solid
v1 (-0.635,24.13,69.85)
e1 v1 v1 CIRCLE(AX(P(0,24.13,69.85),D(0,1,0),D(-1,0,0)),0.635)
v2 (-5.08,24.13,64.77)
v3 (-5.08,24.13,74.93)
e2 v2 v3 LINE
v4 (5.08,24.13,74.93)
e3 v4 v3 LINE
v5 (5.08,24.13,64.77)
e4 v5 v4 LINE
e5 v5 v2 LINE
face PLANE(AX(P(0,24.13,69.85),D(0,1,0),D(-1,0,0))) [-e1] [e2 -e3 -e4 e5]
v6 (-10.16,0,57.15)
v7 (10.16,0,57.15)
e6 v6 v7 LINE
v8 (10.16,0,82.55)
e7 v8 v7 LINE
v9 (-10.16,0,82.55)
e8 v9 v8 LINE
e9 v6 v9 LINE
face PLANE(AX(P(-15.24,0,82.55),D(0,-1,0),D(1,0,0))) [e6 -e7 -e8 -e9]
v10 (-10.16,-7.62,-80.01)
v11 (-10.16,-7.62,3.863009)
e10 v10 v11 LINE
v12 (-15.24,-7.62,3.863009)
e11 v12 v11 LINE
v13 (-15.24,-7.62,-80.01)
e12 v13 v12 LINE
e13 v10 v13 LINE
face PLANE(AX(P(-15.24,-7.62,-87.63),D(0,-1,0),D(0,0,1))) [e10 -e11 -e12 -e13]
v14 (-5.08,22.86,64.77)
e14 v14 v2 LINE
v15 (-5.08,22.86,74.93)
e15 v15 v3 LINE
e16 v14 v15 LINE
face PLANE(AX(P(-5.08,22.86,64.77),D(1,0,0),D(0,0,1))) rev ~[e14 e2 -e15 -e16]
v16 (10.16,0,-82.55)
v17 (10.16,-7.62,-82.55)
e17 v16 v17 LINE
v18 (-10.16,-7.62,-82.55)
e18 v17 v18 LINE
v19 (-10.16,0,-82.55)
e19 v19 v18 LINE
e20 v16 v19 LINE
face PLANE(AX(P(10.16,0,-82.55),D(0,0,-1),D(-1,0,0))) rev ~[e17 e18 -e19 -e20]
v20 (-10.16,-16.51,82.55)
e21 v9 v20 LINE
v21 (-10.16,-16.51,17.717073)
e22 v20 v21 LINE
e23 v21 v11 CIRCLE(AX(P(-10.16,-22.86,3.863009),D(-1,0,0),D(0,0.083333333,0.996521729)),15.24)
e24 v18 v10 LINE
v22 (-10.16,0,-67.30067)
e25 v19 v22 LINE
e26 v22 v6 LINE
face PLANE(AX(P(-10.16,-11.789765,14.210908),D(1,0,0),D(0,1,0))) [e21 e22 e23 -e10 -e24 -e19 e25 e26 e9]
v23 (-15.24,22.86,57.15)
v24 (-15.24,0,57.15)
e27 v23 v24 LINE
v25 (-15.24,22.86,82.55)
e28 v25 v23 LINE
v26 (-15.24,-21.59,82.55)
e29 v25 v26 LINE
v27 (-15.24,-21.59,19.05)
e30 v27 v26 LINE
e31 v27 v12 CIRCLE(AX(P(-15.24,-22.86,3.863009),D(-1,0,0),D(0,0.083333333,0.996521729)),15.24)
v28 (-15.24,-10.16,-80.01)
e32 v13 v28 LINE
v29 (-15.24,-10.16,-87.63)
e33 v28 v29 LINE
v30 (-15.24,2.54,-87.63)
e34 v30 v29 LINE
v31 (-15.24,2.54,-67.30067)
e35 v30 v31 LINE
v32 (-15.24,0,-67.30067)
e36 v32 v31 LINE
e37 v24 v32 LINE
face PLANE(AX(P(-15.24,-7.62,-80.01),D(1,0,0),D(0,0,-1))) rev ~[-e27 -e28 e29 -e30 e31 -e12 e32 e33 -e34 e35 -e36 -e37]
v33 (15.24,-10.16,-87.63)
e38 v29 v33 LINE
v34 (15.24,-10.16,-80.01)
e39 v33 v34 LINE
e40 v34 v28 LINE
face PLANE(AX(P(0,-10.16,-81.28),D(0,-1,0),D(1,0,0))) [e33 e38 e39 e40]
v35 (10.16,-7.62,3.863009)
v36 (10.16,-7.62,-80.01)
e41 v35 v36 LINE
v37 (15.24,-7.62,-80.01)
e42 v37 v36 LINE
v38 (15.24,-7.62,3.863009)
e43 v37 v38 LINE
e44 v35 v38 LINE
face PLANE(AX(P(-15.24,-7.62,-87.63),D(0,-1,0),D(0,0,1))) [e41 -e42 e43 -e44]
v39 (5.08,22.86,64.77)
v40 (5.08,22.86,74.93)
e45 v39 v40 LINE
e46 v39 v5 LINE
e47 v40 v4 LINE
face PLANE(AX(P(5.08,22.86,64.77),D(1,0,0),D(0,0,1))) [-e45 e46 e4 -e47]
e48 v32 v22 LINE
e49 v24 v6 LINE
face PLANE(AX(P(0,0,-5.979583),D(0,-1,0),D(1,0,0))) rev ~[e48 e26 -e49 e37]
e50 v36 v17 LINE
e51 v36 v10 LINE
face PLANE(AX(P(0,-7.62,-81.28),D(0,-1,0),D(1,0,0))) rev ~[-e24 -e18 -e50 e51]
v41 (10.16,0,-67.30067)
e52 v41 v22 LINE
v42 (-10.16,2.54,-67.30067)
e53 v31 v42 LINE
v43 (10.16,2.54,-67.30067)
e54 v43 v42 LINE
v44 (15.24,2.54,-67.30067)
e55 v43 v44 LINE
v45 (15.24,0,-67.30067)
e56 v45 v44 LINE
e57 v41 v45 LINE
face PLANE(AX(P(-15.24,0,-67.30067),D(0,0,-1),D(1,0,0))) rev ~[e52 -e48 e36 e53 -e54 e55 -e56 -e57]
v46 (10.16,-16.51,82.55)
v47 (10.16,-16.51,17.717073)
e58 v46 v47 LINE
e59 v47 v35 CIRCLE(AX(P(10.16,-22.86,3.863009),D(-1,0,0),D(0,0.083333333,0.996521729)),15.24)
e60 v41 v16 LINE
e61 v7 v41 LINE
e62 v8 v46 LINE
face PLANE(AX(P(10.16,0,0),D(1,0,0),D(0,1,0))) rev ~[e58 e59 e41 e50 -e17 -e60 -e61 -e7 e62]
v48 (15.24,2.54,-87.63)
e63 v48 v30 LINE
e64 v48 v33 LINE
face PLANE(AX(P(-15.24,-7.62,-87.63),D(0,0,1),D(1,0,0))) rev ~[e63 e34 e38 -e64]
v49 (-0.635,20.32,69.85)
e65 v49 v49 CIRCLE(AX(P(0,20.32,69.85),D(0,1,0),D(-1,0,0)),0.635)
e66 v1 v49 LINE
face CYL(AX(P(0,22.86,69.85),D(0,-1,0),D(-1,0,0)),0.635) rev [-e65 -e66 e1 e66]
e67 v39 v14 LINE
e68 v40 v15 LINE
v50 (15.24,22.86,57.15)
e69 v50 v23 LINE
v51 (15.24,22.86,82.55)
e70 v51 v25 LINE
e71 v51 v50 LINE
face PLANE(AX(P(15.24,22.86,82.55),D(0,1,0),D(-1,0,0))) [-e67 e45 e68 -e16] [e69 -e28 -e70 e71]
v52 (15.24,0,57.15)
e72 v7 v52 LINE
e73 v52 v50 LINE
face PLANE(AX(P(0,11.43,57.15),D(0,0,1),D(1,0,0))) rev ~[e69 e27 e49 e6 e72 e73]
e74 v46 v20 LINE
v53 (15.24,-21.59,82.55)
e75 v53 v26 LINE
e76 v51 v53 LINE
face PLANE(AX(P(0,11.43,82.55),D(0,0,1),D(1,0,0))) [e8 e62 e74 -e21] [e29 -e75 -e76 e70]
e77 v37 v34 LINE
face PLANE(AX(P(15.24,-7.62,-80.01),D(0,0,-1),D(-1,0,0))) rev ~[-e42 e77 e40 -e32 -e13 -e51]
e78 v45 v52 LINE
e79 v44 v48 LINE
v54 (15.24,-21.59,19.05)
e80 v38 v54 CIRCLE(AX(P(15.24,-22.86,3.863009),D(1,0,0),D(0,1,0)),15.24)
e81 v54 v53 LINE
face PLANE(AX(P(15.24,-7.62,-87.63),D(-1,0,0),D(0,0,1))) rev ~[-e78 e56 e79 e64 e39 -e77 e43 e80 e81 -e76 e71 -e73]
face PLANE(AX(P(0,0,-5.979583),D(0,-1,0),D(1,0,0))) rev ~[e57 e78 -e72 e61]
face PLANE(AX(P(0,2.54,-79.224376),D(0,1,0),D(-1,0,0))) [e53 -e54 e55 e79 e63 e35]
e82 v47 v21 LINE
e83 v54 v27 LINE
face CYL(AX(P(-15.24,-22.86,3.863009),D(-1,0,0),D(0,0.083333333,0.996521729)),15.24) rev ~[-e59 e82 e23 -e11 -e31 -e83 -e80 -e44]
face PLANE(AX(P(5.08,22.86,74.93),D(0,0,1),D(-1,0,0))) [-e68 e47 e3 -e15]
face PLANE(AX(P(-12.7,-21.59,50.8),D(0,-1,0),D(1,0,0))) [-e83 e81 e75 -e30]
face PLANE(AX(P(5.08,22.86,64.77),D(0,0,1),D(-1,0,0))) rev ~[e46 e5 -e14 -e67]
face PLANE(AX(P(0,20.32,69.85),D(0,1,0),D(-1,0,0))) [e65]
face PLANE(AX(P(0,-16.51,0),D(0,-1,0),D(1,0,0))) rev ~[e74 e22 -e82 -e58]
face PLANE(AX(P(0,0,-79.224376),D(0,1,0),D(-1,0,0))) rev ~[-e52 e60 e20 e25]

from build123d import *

# Parameters (mm, degrees)
F1_DEPTH     = 16.51
F2_W         = 8.89
F2_H         = 106.68
F3_DEPTH     = 50.8
F4_W         = 5.08
F4_H         = 63.5
F4_W_2       = 25.4
F5_DEPTH     = 5.08
F6_T1_DEPTH  = 5.08
F6_T6_DEPTH  = 43.0474778593
F6_T12_DEPTH = 81.0149557187
F8_DEPTH     = 25.4
F9_W         = 20.32
F9_H         = 15.2493301511
F10_DEPTH    = 2.54
F11_W        = 20.32
F11_H        = 2.54
F12_DEPTH    = 2.54
F13_R        = 0.635
F14_DEPTH    = 2.54
F15_W        = 10.16
F15_H        = 10.16
F15_R        = 0.635
F16_DEPTH    = 1.27


# Not quite as in the source:
# - a fillet or chamfer that OpenCascade refuses, or shapes differently, is made with other operations: its cross-section is extruded or revolved along the edge and cut away or added


with BuildPart() as f1:
    # F0 (on Front) → F1 (new body)
    with BuildSketch(Plane.XZ):
        Polygon((15.24, 6.35), (15.24, 82.55), (10.16, 82.55), (10.16, -82.55), (-10.16, -82.55), (-10.16, 82.55), (-15.24, 82.55), (-15.24, 6.35), (-15.24, -87.63), (15.24, -87.63), align=None)
    extrude(amount=F1_DEPTH)

    # F2 (on face) → F3 (cut)
    with BuildSketch(Plane(origin=(-15.24, 0, 0), x_dir=(0, -1, 0), z_dir=(-1, 0, 0))):
        with Locations((12.065, -34.29)):
            Rectangle(F2_W, F2_H)
    extrude(amount=-F3_DEPTH, mode=Mode.SUBTRACT)

    # F4 (on face) → F5 (join)
    with BuildSketch(Plane.XZ.offset(16.51)):
        with Locations((-12.7, 50.8)):
            Rectangle(F4_W, F4_H)
        with Locations((2.54, 50.8)):
            Rectangle(F4_W_2, F4_H)
    extrude(amount=F5_DEPTH)

    # F6: fillet of radius 15.24 on 1 edges, made by hand

    # F6_s2 → F6_t1 (join)
    with BuildSketch(Plane.YZ.offset(-15.24)):
        with BuildLine():
            ThreePointArc((-21.59, 19.05), (-11.6436636998, 14.1805376301), (-7.62, 3.8630088563))
            Line((-7.62, 3.8630088563), (-7.62, 19.05))
            Line((-7.62, 19.05), (-21.59, 19.05))
        make_face()
    extrude(amount=F6_T1_DEPTH)


with BuildPart() as f6_tool4:
    # F6_s5 → F6_t6 (new body)
    with BuildSketch(Plane.YZ.offset(-15.24)):
        with BuildLine():
            ThreePointArc((-21.59, 19.05), (-11.6436636998, 14.1805376301), (-7.62, 3.8630088563))
            Line((-7.62, 3.8630088563), (-7.62, 19.05))
            Line((-7.62, 19.05), (-21.59, 19.05))
        make_face()
    extrude(amount=F6_T6_DEPTH)

    split(bisect_by=Plane.YZ.offset(15.24), keep=Keep.BOTTOM)

    split(bisect_by=Plane.XZ.offset(16.51), keep=Keep.TOP)


with BuildPart() as f1_1:
    add(f1.part)

    # F6_t3: union F6_tool4
    add(f6_tool4.part)


with BuildPart() as f6_tool10:
    # F6_s11 → F6_t12 (new body)
    with BuildSketch(Plane.YZ.offset(-53.2074778593)):
        with BuildLine():
            ThreePointArc((-21.59, 19.05), (-11.6436636998, 14.1805376301), (-7.62, 3.8630088563))
            Line((-7.62, 3.8630088563), (-7.62, 19.05))
            Line((-7.62, 19.05), (-21.59, 19.05))
        make_face()
    extrude(amount=F6_T12_DEPTH)

    split(bisect_by=Plane.YZ.offset(15.24), keep=Keep.BOTTOM)

    split(bisect_by=Plane.YZ.offset(10.16), keep=Keep.TOP)


with BuildPart() as f1_2:
    add(f1_1.part)

    # F6_t9: union F6_tool10
    add(f6_tool10.part)

    # F7 (on face) → F8 (join)
    with BuildSketch(Plane.XY.offset(82.55)):
        Polygon((10.16, 0), (15.24, 0), (15.24, 22.86), (-15.24, 22.86), (-15.24, 0), (-10.16, 0), align=None)
    extrude(amount=-F8_DEPTH)

    # F9 (on face) → F10 (join)
    with BuildSketch(Plane(origin=(0, 0, 0), x_dir=(-1, 0, 0), z_dir=(0, 1, 0))):
        Polygon((-15.24, -67.3006698489), (-15.24, -87.63), (15.24, -87.63), (15.24, -67.3006698489), (10.16, -67.3006698489), (10.16, -82.55), (-10.16, -82.55), (-10.16, -67.3006698489), align=None)
        with Locations((0, -74.9253349245)):
            Rectangle(F9_W, F9_H)
    extrude(amount=F10_DEPTH)

    # F11 (on face) → F12 (join)
    with BuildSketch(Plane.XZ.offset(7.62)):
        with Locations((0, -81.28)):
            Rectangle(F11_W, F11_H)
        Polygon((-15.24, -80.01), (-15.24, -87.63), (15.24, -87.63), (15.24, -80.01), (10.16, -80.01), (10.16, -82.55), (-10.16, -82.55), (-10.16, -80.01), align=None)
    extrude(amount=F12_DEPTH)

    # F13 (on face) → F14 (cut)
    with BuildSketch(Plane(origin=(0, 22.86, 0), x_dir=(-1, 0, 0), z_dir=(0, 1, 0))):
        with Locations((0, 69.85)):
            Circle(F13_R)
    extrude(amount=-F14_DEPTH, mode=Mode.SUBTRACT)

    # F15 (on face) → F16 (join)
    with BuildSketch(Plane(origin=(0, 22.86, 0), x_dir=(-1, 0, 0), z_dir=(0, 1, 0))):
        with Locations((0, 69.85)):
            Rectangle(F15_W, F15_H)
        with Locations((0, 69.85)):
            Circle(F15_R, mode=Mode.SUBTRACT)
    extrude(amount=F16_DEPTH)


solid = f1_2.part
